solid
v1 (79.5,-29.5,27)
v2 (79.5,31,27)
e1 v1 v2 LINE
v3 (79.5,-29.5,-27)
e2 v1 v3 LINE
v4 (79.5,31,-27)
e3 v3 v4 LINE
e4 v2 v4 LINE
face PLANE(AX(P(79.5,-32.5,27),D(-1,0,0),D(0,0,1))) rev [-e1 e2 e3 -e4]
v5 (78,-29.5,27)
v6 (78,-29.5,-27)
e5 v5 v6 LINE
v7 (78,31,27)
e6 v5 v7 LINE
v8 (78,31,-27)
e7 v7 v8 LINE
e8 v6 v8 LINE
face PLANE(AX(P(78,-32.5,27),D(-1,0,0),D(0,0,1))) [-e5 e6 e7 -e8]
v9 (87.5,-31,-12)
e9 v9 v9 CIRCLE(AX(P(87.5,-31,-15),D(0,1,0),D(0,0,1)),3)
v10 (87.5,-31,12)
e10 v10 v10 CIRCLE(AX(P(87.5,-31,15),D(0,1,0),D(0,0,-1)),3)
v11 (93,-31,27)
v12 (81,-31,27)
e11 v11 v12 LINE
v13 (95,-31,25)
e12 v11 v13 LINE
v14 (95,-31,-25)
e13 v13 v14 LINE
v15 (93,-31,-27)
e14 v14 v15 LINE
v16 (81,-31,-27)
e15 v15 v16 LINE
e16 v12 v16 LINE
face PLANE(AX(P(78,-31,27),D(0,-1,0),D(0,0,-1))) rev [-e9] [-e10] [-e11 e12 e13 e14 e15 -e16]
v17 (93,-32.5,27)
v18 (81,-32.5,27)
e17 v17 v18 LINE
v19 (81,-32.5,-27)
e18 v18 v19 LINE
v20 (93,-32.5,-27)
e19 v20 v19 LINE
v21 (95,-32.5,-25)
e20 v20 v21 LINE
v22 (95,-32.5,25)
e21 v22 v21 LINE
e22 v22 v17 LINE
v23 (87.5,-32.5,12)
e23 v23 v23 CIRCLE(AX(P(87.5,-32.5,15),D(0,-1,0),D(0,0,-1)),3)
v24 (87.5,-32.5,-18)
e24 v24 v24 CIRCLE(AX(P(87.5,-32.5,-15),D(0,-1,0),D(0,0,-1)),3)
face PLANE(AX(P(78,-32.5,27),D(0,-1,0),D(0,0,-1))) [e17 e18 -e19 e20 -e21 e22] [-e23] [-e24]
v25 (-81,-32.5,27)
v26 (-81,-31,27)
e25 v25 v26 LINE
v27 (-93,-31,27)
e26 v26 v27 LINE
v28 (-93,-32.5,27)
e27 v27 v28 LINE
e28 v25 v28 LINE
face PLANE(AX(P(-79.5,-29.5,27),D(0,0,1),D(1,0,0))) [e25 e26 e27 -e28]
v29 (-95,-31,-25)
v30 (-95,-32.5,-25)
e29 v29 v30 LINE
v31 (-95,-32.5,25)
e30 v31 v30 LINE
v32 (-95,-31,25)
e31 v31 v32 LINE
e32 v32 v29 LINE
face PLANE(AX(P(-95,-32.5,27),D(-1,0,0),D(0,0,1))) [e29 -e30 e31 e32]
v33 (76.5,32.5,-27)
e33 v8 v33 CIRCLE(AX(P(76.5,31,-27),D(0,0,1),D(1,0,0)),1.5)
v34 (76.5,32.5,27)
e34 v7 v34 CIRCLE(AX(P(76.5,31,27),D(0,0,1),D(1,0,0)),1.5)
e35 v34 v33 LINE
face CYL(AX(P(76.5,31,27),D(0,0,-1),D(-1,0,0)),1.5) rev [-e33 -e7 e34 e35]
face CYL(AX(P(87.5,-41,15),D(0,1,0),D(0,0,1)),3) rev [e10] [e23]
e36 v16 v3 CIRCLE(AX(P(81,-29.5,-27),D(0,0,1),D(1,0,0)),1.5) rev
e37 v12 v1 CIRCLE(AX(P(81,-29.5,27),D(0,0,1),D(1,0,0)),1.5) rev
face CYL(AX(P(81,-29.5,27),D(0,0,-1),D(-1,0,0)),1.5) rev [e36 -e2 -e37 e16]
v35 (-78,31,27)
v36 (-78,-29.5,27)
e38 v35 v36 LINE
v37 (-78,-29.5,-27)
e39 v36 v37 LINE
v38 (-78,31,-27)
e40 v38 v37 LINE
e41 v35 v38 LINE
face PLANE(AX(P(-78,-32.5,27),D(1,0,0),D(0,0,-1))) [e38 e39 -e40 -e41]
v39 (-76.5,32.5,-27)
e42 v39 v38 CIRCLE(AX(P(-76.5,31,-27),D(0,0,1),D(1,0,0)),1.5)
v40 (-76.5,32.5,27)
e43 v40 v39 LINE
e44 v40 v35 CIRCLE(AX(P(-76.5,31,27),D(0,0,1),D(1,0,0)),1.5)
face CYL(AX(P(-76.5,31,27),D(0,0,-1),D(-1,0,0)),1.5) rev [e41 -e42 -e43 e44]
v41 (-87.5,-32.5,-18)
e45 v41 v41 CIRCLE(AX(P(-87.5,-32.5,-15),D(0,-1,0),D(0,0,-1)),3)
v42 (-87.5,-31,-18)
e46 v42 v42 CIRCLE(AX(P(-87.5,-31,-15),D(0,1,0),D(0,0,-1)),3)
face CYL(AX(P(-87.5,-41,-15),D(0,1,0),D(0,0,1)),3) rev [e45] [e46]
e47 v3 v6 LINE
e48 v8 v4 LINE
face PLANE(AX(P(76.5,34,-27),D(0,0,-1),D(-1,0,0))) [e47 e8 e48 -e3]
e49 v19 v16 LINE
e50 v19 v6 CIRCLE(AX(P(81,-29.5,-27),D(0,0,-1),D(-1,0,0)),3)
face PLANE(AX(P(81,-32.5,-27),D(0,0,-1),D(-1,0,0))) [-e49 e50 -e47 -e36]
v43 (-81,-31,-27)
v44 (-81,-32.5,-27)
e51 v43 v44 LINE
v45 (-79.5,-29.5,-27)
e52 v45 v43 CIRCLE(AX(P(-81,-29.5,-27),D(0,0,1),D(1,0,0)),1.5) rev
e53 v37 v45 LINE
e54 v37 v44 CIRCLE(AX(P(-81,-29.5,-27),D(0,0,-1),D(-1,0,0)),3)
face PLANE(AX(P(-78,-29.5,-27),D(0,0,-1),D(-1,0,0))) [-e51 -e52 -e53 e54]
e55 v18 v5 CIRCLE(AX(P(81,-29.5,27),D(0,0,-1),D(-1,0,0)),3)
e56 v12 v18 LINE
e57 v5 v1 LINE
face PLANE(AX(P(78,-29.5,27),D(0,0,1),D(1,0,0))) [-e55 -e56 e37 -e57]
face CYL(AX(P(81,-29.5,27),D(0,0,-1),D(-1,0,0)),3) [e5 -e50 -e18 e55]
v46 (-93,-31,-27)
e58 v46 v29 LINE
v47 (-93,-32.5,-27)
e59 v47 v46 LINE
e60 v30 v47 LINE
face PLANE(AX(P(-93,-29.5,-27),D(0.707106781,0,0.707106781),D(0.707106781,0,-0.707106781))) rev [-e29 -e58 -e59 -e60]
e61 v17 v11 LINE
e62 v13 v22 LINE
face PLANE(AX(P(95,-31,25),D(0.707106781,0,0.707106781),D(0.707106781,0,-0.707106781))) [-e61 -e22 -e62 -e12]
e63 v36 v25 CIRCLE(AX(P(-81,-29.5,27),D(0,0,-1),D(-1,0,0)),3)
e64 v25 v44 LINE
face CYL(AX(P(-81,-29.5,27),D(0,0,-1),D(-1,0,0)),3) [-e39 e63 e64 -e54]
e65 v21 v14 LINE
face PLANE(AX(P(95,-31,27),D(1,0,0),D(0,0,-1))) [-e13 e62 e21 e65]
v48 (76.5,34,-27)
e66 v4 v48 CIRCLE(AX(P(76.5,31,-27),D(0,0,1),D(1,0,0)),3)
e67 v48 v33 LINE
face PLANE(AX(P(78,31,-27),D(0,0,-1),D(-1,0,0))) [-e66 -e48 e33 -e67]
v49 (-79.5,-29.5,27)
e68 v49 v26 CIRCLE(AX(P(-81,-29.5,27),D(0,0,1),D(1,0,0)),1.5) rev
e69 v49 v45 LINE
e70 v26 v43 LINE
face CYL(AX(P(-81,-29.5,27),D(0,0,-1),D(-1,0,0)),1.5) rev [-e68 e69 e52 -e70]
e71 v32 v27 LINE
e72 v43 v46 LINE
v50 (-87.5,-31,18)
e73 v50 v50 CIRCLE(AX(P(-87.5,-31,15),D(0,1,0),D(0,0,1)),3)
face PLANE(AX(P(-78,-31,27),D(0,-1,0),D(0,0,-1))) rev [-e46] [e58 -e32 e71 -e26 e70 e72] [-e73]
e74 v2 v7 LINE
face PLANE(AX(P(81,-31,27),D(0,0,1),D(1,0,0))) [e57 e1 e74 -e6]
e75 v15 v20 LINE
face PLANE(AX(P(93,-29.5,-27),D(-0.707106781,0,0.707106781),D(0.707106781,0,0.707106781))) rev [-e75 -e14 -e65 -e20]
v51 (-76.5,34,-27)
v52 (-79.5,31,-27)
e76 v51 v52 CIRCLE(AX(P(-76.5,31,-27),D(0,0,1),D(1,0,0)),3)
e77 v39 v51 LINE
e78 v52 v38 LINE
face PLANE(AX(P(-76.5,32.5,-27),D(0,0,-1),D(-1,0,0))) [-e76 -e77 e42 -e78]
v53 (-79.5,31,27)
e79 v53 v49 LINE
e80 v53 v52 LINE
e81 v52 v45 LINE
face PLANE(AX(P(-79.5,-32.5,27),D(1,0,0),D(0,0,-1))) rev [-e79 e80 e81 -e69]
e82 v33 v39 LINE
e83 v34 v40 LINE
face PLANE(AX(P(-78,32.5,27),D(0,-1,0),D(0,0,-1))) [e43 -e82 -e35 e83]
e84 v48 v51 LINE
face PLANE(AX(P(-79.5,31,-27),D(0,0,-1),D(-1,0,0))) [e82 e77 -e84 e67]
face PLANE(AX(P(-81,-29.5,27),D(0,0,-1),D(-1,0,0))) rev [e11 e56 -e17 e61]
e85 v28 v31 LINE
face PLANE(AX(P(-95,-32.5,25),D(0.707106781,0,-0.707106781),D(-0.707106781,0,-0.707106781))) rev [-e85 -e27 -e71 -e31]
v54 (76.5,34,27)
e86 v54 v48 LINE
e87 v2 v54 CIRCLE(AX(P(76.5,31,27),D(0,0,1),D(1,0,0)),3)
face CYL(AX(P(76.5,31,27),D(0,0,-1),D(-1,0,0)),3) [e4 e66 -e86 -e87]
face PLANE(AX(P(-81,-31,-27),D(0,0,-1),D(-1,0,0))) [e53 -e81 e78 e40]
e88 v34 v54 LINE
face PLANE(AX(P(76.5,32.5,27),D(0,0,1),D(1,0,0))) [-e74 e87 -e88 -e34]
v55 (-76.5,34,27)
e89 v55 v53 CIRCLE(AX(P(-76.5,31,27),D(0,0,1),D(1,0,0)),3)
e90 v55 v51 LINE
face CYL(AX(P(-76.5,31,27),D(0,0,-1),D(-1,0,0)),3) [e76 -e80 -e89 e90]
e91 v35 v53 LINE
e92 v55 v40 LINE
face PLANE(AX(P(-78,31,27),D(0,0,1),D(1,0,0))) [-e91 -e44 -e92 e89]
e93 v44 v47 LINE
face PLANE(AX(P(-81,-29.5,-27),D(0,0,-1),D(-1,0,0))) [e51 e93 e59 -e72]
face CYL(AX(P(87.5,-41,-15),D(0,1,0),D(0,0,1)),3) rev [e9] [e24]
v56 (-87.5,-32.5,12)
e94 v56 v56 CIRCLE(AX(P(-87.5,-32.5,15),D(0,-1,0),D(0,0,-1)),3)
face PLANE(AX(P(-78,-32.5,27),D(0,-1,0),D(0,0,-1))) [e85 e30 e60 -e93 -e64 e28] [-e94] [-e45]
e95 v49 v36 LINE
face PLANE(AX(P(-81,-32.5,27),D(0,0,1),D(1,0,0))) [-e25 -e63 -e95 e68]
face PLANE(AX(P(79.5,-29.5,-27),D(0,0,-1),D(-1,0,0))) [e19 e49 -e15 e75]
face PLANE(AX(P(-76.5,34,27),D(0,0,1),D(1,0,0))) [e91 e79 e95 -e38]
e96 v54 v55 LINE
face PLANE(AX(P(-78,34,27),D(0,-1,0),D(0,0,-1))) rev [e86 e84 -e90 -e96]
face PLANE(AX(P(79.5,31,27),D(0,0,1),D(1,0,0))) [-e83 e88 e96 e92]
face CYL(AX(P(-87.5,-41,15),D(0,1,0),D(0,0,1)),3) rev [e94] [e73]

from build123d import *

# Parameters (mm, degrees)
BASE_FLANGE1_DEPTH = 27
SKETCH2_R          = 3
CUT_EXTRUDE1_DEPTH = 10
CHAMFER1_SIZE      = 2


# Sheet-metal steps are written as plain solids
with BuildPart() as part:
    # Sketch1 → Base-Flange1 (new, symmetric)
    with BuildSketch(Plane.XY):
        with BuildLine():
            Line((95, -32.5), (81, -32.5))
            ThreePointArc((81, -32.5), (78.878679656, -31.621320344), (78, -29.5))
            Line((78, -29.5), (78, 31))
            ThreePointArc((78, 31), (77.560660172, 32.060660172), (76.5, 32.5))
            Line((76.5, 32.5), (-76.5, 32.5))
            ThreePointArc((-76.5, 32.5), (-77.560660172, 32.060660172), (-78, 31))
            Line((-78, 31), (-78, -29.5))
            ThreePointArc((-78, -29.5), (-78.878679656, -31.621320344), (-81, -32.5))
            Line((-81, -32.5), (-95, -32.5))
            Line((-95, -32.5), (-95, -31))
            Line((-95, -31), (-81, -31))
            ThreePointArc((-81, -31), (-79.939339828, -30.560660172), (-79.5, -29.5))
            Line((-79.5, -29.5), (-79.5, 31))
            ThreePointArc((-79.5, 31), (-78.621320344, 33.121320344), (-76.5, 34))
            Line((-76.5, 34), (76.5, 34))
            ThreePointArc((76.5, 34), (78.621320344, 33.121320344), (79.5, 31))
            Line((79.5, 31), (79.5, -29.5))
            ThreePointArc((79.5, -29.5), (79.939339828, -30.560660172), (81, -31))
            Line((81, -31), (95, -31))
            Line((95, -31), (95, -32.5))
        make_face()
    extrude(amount=BASE_FLANGE1_DEPTH, both=True)

    # Sketch2 → Cut-Extrude1 (cut)
    with BuildSketch(Plane(origin=(0, -31, 0), x_dir=(1, 0, 0), z_dir=(0, 1, 0))):
        with Locations(Location((-87.5, -15, 0), (0, 0, 270))):
            Circle(SKETCH2_R)
        with Locations(Location((87.5, -15, 0), (0, 0, 90))):
            Circle(SKETCH2_R)
        with Locations(Location((87.5, 15, 0), (0, 0, 270))):
            Circle(SKETCH2_R)
        with Locations(Location((-87.5, 15, 0), (0, 0, 90))):
            Circle(SKETCH2_R)
    extrude(amount=-CUT_EXTRUDE1_DEPTH, mode=Mode.SUBTRACT)

    # Chamfer1
    chamfer1_edges = [part.edges().sort_by_distance(p)[0] for p in [
        (95, -31.75, -27),
        (-95, -31.75, -27),
        (95, -31.75, 27),
        (-95, -31.75, 27),
    ]]
    chamfer(chamfer1_edges, length=CHAMFER1_SIZE)


solid = part.part
